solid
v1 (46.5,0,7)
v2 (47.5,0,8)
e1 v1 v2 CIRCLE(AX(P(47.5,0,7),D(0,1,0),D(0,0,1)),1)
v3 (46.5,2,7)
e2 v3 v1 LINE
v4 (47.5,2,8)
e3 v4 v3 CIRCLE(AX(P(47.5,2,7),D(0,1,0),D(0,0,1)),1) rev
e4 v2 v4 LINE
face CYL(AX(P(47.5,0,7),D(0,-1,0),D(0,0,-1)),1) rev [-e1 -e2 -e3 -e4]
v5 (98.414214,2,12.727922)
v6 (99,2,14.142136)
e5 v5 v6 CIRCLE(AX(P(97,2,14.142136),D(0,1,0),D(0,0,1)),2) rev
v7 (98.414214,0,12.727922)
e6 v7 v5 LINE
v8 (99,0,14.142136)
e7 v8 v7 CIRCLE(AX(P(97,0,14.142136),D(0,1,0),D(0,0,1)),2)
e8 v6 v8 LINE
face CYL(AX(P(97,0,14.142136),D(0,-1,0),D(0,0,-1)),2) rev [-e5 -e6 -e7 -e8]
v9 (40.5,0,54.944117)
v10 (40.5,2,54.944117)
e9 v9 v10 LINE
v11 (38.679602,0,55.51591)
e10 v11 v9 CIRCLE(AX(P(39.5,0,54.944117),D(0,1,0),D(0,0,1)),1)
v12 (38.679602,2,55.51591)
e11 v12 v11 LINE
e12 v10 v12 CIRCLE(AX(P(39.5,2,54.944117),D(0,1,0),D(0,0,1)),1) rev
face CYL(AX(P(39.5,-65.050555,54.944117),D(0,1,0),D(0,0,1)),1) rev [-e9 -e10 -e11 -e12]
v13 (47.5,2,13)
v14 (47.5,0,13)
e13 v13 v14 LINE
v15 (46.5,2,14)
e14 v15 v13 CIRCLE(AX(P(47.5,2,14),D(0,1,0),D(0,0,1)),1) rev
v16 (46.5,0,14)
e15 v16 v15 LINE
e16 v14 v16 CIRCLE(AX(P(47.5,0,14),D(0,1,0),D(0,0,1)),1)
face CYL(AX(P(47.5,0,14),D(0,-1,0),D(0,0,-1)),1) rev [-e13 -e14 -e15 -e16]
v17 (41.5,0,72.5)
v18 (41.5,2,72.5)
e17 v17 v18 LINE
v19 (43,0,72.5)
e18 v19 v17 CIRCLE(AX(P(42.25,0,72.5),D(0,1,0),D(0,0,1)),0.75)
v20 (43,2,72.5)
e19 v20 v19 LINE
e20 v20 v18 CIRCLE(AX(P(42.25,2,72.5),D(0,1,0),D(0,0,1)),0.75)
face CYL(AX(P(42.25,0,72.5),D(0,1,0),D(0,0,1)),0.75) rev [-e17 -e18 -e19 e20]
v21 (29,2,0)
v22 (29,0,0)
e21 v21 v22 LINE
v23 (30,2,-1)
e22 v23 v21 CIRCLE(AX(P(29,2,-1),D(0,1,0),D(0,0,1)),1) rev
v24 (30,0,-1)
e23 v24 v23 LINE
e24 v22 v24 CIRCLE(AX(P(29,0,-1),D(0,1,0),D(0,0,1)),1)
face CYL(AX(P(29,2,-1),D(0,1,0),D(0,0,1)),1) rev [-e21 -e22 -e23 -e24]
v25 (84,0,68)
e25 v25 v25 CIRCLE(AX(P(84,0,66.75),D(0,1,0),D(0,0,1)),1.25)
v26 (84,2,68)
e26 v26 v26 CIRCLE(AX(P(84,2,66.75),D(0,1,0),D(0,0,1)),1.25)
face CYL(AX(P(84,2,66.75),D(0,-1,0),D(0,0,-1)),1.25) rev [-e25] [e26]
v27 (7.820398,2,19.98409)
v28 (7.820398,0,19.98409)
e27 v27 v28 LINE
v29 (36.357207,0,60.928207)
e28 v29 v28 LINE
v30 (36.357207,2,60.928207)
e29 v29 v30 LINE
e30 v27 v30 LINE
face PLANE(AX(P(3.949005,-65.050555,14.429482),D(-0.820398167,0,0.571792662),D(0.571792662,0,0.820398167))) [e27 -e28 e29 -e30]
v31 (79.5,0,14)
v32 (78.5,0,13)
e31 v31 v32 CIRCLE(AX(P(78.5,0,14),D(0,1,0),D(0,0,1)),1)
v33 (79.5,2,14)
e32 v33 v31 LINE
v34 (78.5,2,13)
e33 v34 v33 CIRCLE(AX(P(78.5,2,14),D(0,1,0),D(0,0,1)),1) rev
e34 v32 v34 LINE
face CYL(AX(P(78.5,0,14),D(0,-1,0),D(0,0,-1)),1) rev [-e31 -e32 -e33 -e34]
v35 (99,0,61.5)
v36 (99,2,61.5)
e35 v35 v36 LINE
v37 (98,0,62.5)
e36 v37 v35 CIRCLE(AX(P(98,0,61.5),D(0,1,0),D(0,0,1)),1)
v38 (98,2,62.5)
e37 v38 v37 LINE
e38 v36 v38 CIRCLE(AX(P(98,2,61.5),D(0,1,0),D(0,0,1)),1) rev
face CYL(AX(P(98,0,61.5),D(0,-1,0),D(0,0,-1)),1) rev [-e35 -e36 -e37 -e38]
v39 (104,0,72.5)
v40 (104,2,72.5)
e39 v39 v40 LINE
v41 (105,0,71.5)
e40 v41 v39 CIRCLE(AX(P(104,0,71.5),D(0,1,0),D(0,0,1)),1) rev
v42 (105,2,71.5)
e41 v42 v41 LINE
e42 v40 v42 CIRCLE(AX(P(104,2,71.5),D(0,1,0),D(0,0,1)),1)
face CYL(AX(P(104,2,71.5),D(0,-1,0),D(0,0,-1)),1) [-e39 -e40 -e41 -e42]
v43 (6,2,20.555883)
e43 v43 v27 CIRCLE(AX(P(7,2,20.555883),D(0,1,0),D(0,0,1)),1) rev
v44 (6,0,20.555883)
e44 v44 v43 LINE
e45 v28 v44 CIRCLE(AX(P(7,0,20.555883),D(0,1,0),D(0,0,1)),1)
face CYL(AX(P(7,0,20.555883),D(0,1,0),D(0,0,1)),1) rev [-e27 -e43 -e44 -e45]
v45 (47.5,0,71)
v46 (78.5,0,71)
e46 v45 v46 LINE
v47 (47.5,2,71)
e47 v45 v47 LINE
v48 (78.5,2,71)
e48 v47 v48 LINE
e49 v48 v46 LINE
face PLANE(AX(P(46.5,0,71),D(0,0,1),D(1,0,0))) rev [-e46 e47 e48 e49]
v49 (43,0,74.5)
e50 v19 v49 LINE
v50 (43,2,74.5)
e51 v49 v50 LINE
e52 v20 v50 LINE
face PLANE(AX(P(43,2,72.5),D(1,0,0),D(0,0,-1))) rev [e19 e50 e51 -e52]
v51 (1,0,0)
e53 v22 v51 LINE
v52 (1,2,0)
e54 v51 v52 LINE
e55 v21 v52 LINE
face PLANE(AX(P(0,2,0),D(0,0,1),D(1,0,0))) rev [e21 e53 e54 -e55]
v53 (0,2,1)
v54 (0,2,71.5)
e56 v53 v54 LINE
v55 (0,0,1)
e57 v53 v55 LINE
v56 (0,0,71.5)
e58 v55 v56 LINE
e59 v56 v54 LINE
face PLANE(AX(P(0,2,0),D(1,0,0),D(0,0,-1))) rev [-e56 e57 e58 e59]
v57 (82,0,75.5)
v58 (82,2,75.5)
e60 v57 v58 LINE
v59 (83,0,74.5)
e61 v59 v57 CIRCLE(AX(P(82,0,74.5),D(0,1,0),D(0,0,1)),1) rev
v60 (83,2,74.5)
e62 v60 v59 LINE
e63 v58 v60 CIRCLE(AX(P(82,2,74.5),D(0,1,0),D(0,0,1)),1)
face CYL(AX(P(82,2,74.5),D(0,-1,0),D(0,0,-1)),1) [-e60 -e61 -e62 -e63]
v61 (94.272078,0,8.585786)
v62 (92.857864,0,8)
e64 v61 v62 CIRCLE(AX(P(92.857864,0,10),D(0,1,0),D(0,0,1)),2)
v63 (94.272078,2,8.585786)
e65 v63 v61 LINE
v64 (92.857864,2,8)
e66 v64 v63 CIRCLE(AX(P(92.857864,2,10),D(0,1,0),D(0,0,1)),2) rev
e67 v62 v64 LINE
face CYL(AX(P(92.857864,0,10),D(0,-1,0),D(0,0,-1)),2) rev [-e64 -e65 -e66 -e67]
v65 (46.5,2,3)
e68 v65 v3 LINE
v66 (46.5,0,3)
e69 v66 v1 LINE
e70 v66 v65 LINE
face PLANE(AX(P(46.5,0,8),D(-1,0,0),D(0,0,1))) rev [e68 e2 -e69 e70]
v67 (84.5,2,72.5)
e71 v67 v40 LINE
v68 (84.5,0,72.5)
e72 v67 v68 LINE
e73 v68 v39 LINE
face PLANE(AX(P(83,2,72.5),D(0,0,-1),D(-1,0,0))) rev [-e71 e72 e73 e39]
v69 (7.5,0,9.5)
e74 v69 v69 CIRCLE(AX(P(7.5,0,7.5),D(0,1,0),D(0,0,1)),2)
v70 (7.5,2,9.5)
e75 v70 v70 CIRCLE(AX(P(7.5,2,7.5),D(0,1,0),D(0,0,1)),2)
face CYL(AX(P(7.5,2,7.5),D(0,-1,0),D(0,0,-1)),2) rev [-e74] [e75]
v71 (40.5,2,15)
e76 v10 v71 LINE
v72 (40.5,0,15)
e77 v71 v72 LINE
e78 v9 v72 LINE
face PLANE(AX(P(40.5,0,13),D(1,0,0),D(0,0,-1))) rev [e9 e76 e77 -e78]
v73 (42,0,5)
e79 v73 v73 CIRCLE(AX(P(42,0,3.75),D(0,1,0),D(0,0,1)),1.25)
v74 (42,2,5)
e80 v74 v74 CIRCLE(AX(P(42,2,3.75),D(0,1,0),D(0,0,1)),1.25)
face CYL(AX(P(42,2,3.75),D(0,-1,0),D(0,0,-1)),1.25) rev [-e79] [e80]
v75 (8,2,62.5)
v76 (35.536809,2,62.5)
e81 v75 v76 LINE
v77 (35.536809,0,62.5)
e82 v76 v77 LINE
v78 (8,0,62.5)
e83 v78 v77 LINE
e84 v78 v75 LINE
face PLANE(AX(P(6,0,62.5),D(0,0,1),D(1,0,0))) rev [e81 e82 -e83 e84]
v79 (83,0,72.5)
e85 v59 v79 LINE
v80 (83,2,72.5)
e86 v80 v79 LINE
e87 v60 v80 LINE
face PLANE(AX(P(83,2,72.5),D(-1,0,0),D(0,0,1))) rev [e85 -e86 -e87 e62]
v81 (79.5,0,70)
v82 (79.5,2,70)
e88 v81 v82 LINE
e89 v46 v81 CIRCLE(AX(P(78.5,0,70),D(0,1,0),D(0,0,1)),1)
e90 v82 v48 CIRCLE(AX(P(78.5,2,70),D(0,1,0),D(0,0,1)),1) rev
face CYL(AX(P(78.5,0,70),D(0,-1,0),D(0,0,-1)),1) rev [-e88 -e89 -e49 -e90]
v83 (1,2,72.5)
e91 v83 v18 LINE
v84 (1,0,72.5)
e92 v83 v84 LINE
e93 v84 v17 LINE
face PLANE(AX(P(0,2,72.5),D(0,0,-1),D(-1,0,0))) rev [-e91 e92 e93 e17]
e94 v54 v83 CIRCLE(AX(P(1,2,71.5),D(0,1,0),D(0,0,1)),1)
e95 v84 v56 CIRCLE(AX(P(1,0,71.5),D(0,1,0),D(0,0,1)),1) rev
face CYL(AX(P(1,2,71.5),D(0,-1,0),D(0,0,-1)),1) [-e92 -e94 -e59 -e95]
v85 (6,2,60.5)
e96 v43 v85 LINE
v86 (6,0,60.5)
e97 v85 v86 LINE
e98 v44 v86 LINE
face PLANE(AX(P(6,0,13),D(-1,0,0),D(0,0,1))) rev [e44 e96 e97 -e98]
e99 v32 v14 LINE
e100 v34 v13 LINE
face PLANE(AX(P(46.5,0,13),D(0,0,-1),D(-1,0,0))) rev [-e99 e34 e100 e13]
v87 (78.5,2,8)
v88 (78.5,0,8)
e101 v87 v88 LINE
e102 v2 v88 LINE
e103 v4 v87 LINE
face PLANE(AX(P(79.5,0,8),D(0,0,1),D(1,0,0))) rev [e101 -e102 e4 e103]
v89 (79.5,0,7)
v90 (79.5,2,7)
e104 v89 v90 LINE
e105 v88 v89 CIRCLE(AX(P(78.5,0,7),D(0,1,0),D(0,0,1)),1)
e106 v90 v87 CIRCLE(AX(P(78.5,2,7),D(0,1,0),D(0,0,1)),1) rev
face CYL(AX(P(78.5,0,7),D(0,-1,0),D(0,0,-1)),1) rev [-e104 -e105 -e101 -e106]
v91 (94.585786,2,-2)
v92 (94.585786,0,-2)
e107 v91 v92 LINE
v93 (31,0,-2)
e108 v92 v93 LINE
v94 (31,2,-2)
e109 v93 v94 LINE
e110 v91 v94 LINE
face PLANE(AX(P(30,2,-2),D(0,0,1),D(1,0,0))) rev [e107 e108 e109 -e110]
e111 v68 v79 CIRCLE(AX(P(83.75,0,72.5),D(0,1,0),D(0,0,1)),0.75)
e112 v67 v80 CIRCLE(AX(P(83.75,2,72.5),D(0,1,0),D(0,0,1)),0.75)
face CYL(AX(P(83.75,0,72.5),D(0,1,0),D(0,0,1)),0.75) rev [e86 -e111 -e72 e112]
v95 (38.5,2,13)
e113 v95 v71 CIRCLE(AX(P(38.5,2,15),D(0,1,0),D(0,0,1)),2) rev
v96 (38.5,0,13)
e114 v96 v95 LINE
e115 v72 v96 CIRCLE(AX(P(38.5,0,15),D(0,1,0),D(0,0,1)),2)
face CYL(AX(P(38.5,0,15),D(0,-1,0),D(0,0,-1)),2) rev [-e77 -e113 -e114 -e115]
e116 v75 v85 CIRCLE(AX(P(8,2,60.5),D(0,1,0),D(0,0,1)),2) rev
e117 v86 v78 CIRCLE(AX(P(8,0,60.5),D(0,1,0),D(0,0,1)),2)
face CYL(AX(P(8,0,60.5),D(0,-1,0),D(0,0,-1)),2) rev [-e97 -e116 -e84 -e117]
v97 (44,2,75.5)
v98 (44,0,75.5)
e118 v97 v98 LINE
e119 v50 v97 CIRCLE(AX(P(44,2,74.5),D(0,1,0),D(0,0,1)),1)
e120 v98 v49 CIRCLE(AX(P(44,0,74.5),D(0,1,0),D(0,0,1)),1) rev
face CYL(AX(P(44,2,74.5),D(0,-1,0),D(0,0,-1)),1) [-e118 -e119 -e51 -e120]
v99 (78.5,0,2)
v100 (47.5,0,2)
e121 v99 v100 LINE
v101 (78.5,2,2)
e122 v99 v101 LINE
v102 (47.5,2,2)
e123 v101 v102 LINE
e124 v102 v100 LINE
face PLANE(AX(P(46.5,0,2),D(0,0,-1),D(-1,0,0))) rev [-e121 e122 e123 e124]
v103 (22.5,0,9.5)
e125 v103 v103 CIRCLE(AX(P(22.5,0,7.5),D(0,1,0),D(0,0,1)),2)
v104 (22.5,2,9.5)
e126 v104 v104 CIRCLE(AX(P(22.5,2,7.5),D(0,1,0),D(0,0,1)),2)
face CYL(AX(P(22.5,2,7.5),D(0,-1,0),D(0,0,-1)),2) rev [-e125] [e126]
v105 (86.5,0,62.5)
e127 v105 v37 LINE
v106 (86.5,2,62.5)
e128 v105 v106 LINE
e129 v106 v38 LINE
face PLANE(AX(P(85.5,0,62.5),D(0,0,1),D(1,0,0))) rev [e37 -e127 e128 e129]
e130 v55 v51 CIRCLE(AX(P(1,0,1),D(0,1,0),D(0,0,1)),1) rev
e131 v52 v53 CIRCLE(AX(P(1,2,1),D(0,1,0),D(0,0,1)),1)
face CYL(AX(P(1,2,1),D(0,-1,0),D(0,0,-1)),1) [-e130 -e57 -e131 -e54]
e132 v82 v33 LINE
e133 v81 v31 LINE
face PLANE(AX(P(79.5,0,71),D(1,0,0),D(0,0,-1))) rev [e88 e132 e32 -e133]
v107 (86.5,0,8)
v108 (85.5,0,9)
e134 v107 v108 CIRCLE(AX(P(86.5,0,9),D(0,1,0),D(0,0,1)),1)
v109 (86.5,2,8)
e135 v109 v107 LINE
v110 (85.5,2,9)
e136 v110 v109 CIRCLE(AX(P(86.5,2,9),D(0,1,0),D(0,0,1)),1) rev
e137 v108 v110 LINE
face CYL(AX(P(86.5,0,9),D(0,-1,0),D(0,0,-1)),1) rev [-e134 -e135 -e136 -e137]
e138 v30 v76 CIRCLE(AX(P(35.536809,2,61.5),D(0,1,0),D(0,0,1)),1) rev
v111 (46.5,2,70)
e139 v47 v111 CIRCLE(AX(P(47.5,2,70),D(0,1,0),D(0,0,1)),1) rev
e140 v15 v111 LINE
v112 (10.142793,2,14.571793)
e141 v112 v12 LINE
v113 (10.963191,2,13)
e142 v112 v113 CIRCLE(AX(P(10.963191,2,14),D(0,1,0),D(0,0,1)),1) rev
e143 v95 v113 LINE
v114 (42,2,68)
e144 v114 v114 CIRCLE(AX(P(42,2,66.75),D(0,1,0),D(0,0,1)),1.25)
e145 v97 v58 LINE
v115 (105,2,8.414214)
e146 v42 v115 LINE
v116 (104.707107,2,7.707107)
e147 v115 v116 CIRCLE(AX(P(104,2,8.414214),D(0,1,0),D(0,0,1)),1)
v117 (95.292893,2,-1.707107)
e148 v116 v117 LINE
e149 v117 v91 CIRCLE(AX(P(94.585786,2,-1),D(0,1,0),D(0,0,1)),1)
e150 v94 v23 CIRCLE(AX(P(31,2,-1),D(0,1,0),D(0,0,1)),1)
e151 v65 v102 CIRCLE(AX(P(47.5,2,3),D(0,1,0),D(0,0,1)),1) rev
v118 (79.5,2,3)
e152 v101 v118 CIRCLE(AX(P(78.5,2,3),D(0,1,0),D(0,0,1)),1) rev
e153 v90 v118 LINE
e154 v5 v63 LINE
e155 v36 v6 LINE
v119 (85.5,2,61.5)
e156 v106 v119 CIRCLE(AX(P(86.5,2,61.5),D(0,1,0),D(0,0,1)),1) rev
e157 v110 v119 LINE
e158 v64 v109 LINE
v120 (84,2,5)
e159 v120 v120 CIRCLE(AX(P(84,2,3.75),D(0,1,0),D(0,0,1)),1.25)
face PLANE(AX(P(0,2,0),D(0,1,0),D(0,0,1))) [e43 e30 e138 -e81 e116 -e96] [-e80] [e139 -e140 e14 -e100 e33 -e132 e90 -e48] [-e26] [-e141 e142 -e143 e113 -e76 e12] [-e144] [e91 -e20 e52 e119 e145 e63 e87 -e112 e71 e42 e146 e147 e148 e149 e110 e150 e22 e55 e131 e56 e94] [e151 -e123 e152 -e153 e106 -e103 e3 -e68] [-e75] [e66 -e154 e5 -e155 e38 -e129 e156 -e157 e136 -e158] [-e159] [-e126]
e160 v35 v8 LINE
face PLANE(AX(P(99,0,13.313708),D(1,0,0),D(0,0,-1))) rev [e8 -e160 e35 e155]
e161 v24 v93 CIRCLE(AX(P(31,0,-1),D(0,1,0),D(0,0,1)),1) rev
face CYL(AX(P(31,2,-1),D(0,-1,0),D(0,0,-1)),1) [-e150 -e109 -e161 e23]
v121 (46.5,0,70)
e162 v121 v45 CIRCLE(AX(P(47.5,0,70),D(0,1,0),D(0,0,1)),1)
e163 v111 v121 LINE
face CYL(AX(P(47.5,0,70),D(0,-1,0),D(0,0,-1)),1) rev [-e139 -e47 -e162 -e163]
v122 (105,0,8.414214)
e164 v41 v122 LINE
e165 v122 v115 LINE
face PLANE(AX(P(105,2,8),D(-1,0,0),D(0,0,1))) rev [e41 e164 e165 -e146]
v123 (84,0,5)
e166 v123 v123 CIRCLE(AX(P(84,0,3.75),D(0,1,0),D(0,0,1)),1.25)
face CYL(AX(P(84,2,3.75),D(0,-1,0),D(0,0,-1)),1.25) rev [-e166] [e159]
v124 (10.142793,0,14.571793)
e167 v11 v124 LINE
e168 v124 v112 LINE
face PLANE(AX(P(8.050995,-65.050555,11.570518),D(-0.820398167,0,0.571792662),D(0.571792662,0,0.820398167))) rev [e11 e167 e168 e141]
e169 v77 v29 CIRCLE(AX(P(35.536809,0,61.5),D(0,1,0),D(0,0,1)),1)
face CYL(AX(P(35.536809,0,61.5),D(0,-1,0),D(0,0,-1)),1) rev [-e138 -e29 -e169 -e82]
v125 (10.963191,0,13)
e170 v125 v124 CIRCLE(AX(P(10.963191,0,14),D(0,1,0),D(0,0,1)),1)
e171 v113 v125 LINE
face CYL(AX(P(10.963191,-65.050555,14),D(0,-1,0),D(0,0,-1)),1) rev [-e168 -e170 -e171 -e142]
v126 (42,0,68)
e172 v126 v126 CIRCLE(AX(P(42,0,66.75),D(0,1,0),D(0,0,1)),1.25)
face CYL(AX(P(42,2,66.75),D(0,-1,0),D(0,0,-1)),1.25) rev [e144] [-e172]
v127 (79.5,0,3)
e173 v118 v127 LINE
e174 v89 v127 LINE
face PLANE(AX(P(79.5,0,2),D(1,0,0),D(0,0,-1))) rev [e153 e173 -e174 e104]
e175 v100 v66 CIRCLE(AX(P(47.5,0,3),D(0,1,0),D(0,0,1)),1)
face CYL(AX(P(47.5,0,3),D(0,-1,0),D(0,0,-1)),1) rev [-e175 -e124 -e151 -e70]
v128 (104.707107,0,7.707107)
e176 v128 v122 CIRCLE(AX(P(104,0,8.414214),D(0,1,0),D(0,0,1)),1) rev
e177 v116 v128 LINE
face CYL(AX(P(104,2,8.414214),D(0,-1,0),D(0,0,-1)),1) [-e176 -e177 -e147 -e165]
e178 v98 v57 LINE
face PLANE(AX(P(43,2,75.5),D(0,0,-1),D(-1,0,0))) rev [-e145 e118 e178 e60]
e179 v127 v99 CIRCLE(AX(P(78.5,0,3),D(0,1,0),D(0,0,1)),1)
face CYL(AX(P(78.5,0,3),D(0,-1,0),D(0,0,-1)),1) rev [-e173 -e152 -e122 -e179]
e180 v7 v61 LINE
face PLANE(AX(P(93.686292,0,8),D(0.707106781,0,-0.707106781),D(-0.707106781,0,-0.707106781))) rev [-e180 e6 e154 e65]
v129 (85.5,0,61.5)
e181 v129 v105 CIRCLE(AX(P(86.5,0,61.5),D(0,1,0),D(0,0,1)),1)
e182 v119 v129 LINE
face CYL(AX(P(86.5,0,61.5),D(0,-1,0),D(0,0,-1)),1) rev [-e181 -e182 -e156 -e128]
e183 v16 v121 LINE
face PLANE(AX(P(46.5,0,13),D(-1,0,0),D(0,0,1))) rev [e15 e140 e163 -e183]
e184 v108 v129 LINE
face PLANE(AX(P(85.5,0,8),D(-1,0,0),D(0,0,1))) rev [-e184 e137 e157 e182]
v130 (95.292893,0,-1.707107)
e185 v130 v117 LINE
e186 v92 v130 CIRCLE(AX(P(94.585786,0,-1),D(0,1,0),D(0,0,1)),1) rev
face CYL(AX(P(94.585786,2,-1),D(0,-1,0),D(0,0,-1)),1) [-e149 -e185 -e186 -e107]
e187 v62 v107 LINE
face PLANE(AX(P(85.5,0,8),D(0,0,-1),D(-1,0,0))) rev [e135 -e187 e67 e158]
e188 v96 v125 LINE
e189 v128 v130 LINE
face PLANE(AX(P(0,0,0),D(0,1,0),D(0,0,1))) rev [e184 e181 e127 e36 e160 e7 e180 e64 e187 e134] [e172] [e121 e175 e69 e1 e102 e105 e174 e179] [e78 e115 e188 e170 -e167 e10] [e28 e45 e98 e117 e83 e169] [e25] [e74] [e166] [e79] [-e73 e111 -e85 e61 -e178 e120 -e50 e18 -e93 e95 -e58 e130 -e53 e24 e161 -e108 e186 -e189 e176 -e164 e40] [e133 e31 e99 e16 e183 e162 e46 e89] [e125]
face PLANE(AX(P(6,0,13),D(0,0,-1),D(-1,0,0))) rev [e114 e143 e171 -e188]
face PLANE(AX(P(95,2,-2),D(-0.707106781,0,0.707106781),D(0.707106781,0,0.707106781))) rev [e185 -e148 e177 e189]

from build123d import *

# Parameters (mm, degrees)
SKETCH_1_R          = 2
SKETCH_1_R_2        = 1.25
EXTRUDE_1_DEPTH     = 2
SKETCH_3_W          = 33
SKETCH_3_H          = 6
SKETCH_3_H_2        = 58
SKETCH_3_W_2        = 34.5
SKETCH_3_H_3        = 49.5
CUT_EXTRUDE_2_DEPTH = 130.341601969
SKETCH_2_R          = 0.75
CUT_EXTRUDE_1_DEPTH = 130.341601969
EXTRUDE_1_2_DEPTH   = 2
FILLET_1_R          = 1
FILLET_2_R          = 2


with BuildPart() as part:
    # 草图1 → Extrude 1 (new body)
    with BuildSketch(Plane(origin=(0, 0, 0), x_dir=(1, 0, 0), z_dir=(0, 1, 0))):
        Polygon((0, 0), (30, 0), (30, 2), (95, 2), (105, -8), (105, -72.5), (83, -72.5), (83, -75.5), (43, -75.5), (43, -72.5), (0, -72.5), align=None)
        with Locations(Location((7.5, -7.5, 0), (0, 0, 270))):
            Circle(SKETCH_1_R, mode=Mode.SUBTRACT)
        with Locations(Location((22.5, -7.5, 0), (0, 0, 270))):
            Circle(SKETCH_1_R, mode=Mode.SUBTRACT)
        with Locations(Location((42, -3.75, 0), (0, 0, 270))):
            Circle(SKETCH_1_R_2, mode=Mode.SUBTRACT)
        with Locations(Location((42, -66.75, 0), (0, 0, 270))):
            Circle(SKETCH_1_R_2, mode=Mode.SUBTRACT)
        with Locations(Location((84, -66.75, 0), (0, 0, 270))):
            Circle(SKETCH_1_R_2, mode=Mode.SUBTRACT)
        with Locations(Location((84, -3.75, 0), (0, 0, 270))):
            Circle(SKETCH_1_R_2, mode=Mode.SUBTRACT)
    extrude(amount=EXTRUDE_1_DEPTH)

    # 草图3 → 切除-拉伸2 (cut, through all)
    with BuildSketch(Plane(origin=(0, 2, 0), x_dir=(1, 0, 0), z_dir=(0, 1, 0))):
        with Locations((63, -5)):
            Rectangle(SKETCH_3_W, SKETCH_3_H)
        with Locations((63, -42)):
            Rectangle(SKETCH_3_W, SKETCH_3_H_2)
        with Locations((23.25, -37.75)):
            Rectangle(SKETCH_3_W_2, SKETCH_3_H_3)
        Polygon((93.686291501, -8), (99, -13.313708499), (99, -62.5), (85.5, -62.5), (85.5, -8), align=None)
    extrude(amount=-CUT_EXTRUDE_2_DEPTH, mode=Mode.SUBTRACT)

    # 草图2 → 切除-拉伸1 (cut, through all)
    with BuildSketch(Plane(origin=(0, 2, 0), x_dir=(1, 0, 0), z_dir=(0, 1, 0))):
        with Locations((42.25, -72.5)):
            Circle(SKETCH_2_R)
        with Locations((83.75, -72.5)):
            Circle(SKETCH_2_R)
    extrude(amount=-CUT_EXTRUDE_1_DEPTH, mode=Mode.SUBTRACT)

    # 草图4 → Extrude 1 2 (add)
    with BuildSketch(Plane(origin=(0, 2, 0), x_dir=(1, 0, 0), z_dir=(0, 1, 0))):
        Polygon((3.949004583, -14.429481654), (38.449004583, -63.929481654), (42.550995417, -61.070518346), (8.050995417, -11.570518346), align=None)
    extrude(amount=-EXTRUDE_1_2_DEPTH)

    # 圆角1
    fillet_1_edges = [part.edges().sort_by_distance(p)[0] for p in [
        (0, 1, 0),
        (83, 1, 75.5),
        (0, 1, 72.5),
        (43, 1, 75.5),
        (105, 1, 72.5),
        (30, 1, -2),
        (30, 1, 0),
        (105, 1, 8),
        (95, 1, -2),
        (46.5, 1, 71),
        (46.5, 1, 13),
        (79.5, 1, 13),
        (79.5, 1, 71),
        (46.5, 1, 8),
        (46.5, 1, 2),
        (79.5, 1, 2),
        (79.5, 1, 8),
        (99, 1, 62.5),
        (85.5, 1, 62.5),
        (85.5, 1, 8),
        (37.452699188, 1, 62.5),
        (40.5, 1, 58.127785791),
        (6, 1, 17.372214209),
        (9.047300812, 1, 13),
    ]]
    fillet(fillet_1_edges, radius=FILLET_1_R - 0.0001)  # a hair under: the kernel refuses the full size

    # 圆角2
    fillet_2_edges = [part.edges().sort_by_distance(p)[0] for p in [
        (93.686291501, 1, 8),
        (99, 1, 13.313708499),
        (6, 1, 62.5),
        (40.5, 1, 13),
    ]]
    fillet(fillet_2_edges, radius=FILLET_2_R)


solid = part.part
